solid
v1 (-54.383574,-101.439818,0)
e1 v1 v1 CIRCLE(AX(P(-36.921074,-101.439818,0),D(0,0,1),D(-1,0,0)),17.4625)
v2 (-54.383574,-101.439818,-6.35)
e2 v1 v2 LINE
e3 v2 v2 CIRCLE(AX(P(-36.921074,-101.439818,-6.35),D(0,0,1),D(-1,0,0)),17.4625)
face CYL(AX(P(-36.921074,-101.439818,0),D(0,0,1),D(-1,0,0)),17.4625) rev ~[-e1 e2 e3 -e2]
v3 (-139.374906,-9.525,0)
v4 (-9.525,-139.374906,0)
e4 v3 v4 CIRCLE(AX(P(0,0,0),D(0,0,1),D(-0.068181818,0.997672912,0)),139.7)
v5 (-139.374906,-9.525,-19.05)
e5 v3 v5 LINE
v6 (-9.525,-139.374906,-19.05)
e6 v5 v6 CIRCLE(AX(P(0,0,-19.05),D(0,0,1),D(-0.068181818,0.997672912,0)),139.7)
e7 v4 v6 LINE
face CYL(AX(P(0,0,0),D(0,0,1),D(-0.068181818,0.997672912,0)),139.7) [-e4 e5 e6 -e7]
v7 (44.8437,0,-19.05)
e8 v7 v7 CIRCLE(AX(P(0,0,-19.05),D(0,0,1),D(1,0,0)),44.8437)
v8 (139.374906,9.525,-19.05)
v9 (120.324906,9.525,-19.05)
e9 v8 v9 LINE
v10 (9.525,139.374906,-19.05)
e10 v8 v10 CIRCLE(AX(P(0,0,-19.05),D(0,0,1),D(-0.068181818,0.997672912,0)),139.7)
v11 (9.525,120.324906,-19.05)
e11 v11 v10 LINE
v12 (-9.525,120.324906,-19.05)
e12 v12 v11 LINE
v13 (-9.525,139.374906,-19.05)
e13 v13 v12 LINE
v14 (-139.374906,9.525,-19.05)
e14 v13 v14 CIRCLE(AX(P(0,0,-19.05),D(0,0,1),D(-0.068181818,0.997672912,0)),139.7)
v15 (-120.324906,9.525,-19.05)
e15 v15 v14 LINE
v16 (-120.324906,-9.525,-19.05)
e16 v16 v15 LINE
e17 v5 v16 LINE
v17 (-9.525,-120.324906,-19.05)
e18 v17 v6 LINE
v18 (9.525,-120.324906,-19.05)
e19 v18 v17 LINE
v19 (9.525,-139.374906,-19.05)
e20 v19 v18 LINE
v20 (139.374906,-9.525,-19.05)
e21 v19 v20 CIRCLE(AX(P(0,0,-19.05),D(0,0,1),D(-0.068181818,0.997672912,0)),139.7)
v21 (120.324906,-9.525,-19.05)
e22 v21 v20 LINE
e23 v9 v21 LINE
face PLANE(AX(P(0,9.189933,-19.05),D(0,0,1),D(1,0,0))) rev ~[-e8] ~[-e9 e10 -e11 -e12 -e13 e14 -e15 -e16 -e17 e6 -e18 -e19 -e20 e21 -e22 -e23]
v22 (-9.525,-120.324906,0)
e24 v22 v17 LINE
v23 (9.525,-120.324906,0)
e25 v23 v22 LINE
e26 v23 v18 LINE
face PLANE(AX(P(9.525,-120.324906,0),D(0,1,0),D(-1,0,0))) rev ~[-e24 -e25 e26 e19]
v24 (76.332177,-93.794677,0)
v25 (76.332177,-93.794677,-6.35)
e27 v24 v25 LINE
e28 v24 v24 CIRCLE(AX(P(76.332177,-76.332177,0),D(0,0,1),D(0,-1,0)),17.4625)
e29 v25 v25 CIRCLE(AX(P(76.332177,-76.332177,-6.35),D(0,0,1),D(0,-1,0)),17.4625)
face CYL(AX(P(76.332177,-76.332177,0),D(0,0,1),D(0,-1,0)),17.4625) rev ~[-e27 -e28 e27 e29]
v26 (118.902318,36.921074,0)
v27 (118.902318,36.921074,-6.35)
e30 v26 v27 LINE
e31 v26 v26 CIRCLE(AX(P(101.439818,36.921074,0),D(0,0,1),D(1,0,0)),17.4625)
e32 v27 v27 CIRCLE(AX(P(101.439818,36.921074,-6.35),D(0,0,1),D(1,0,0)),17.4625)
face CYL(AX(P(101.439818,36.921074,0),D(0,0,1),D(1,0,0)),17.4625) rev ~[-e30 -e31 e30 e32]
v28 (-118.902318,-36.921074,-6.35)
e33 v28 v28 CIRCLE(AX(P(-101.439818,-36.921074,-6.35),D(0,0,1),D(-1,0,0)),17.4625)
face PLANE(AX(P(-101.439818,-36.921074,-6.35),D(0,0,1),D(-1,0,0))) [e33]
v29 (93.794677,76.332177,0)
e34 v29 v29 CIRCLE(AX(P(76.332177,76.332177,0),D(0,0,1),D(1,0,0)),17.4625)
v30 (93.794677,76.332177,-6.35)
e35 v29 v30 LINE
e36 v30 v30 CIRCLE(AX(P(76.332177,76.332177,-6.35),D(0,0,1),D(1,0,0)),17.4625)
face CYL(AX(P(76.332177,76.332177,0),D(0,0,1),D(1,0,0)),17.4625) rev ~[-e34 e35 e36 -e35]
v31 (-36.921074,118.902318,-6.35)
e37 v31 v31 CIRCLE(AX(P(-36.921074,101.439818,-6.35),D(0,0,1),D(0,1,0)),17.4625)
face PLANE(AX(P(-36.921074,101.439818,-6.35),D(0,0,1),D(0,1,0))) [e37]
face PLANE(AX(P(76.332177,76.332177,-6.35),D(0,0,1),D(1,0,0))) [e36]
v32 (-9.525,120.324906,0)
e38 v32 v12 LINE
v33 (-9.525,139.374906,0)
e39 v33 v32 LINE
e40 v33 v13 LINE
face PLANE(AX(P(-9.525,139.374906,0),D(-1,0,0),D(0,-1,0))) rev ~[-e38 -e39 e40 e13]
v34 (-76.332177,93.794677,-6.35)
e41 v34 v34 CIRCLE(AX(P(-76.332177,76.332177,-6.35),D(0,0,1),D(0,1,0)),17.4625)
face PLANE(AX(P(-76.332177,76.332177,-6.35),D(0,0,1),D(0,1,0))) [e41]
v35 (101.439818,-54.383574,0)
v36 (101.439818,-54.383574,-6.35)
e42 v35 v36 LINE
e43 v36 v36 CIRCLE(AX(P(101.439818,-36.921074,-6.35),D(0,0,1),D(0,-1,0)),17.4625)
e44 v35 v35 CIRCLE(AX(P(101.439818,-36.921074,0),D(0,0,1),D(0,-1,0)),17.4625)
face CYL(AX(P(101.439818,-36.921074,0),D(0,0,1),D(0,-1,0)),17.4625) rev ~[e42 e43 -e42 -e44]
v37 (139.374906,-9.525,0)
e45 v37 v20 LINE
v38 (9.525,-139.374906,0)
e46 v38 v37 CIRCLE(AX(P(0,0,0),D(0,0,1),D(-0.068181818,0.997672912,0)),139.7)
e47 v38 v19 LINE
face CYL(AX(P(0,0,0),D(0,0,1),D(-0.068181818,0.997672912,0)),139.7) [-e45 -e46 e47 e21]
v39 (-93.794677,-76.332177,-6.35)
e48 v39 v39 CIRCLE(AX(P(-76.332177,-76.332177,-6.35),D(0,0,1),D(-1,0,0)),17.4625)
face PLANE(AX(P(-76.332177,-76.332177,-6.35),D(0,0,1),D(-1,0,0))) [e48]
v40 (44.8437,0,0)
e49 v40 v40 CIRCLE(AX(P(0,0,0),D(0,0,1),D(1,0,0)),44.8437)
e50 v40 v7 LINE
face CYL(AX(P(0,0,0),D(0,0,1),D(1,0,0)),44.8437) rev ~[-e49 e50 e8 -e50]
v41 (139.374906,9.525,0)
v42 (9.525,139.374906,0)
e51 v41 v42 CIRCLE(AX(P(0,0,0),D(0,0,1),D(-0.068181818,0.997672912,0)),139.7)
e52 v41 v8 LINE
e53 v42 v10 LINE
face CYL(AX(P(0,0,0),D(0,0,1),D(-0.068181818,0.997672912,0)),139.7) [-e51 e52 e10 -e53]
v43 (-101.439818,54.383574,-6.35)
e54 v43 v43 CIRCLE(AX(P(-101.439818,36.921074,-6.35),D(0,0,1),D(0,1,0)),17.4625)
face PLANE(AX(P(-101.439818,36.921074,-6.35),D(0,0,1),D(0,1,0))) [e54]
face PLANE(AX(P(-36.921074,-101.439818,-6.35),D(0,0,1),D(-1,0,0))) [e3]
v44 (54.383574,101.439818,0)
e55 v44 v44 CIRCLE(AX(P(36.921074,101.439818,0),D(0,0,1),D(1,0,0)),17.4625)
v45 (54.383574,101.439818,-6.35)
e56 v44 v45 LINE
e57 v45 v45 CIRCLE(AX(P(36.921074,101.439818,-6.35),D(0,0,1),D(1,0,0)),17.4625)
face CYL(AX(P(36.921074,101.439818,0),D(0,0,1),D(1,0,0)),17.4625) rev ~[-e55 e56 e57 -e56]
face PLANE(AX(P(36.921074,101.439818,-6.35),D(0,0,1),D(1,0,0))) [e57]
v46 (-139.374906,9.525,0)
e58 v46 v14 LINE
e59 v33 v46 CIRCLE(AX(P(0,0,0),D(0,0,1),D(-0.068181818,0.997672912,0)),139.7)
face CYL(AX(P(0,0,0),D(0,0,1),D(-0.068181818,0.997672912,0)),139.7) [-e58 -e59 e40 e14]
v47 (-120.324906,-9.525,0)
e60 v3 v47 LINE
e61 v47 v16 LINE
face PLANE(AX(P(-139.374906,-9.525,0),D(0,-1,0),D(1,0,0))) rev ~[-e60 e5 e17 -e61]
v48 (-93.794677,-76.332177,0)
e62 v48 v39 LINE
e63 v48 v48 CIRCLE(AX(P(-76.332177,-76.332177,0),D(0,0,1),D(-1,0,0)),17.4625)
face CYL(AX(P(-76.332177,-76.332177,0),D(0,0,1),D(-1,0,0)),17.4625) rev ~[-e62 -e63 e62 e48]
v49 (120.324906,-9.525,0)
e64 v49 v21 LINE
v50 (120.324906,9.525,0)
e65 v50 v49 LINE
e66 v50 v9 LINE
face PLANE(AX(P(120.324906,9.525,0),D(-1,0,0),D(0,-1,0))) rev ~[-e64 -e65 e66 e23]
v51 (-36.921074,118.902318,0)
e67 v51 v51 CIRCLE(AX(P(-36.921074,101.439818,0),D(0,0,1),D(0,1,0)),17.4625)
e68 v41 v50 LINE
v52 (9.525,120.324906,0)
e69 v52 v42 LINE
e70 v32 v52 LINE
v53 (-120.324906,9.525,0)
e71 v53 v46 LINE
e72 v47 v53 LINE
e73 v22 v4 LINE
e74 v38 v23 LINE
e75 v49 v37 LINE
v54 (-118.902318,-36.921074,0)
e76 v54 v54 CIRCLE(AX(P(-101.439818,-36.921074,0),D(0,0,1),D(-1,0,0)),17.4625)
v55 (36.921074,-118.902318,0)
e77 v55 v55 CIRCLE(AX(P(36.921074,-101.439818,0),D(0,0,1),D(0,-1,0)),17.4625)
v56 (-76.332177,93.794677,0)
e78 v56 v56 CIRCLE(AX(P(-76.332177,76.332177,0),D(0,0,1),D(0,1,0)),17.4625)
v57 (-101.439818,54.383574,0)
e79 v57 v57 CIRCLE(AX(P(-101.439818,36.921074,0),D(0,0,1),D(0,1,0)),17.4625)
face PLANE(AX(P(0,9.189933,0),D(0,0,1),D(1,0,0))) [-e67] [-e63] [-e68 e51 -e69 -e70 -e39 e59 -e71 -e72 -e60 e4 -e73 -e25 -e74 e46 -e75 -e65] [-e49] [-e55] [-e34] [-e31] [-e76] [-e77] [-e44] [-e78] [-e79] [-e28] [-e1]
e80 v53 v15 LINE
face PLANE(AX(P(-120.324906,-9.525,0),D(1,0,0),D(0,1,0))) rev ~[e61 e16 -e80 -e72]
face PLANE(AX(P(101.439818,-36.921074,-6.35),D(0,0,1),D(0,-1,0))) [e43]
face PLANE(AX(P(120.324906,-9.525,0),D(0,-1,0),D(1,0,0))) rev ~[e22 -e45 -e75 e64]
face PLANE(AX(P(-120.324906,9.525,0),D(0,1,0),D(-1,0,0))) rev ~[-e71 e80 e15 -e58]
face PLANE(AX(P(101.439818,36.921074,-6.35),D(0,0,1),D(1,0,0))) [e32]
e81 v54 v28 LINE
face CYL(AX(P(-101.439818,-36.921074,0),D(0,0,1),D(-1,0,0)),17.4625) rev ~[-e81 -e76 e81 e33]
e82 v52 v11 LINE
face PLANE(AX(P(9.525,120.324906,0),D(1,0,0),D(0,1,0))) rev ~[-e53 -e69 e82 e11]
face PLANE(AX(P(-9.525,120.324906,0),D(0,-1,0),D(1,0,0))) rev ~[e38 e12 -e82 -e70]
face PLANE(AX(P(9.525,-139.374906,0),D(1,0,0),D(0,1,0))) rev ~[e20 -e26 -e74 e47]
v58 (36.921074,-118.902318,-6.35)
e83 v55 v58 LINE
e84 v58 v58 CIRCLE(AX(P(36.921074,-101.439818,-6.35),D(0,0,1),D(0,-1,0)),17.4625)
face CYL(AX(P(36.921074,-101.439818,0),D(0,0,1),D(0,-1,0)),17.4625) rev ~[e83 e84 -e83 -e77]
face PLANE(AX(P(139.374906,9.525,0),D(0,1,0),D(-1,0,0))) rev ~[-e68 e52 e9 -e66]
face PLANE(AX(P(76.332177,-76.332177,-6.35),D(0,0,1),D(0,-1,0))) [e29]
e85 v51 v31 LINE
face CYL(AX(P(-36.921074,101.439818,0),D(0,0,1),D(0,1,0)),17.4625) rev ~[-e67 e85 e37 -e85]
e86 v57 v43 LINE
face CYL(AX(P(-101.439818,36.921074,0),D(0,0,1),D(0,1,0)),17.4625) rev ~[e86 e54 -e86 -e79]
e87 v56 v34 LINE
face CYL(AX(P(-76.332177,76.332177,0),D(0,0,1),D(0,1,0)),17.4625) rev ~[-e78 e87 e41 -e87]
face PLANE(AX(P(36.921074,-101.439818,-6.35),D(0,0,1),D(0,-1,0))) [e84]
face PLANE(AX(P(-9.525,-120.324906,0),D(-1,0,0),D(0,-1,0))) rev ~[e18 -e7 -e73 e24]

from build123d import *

# Parameters (mm, degrees)
F0_R            = 44.8437
F0_R_2          = 17.4625
F0_W            = 19.05
F0_H            = 6.35
F1_DEPTH        = 19.05
F2_DEPTH        = 6.35
F2_COPIES_COUNT = 4
F3_DEPTH        = 19.051
F3_COPIES_COUNT = 4
F5_DEPTH        = 25.4


# Not quite as in the source:
# - a pattern or mirror of a feature is missing from the dataset's text; its kind, count and spacing are read off the source's solid


with BuildPart() as f1:
    # F0 (on Top) → F1 (new body)
    with BuildSketch(Plane.XY):
        with BuildLine():
            ThreePointArc((-9.525, 139.3749058296), (-95.3557746023, -102.0948884617), (139.7, 0))
            ThreePointArc((139.7, 0), (102.0948884617, 95.3557746023), (9.525, 139.3749058296))
            Line((9.525, 139.3749058296), (9.525, 120.3249058296))
            Line((9.525, 120.3249058296), (9.525, 113.9749058296))
            Line((9.525, 113.9749058296), (-9.525, 113.9749058296))
            Line((-9.525, 113.9749058296), (-9.525, 120.3249058296))
            Line((-9.525, 120.3249058296), (-9.525, 139.3749058296))
        make_face()
        Circle(F0_R, mode=Mode.SUBTRACT)
        with Locations((101.4398184138, 36.921074472)):
            Circle(F0_R_2, mode=Mode.SUBTRACT)
        with Locations((36.921074472, 101.4398184138)):
            Circle(F0_R_2, mode=Mode.SUBTRACT)
        with Locations((76.3321770291, 76.3321770291)):
            Circle(F0_R_2, mode=Mode.SUBTRACT)
        with BuildLine():
            Line((9.525, 120.3249058296), (9.525, 139.3749058296))
            ThreePointArc((9.525, 139.3749058296), (0, 139.7), (-9.525, 139.3749058296))
            Line((-9.525, 139.3749058296), (-9.525, 120.3249058296))
            Line((-9.525, 120.3249058296), (9.525, 120.3249058296))
        make_face()
        with Locations((36.921074472, 101.4398184138)):
            Circle(F0_R_2)
        with Locations((76.3321770291, 76.3321770291)):
            Circle(F0_R_2)
        with Locations((101.4398184138, 36.921074472)):
            Circle(F0_R_2)
        with Locations((0, 117.1499058296)):
            Rectangle(F0_W, F0_H)
        Circle(F0_R)
    extrude(amount=-F1_DEPTH)

    # F0 (on Top) → F2 (cut)
    with BuildSketch(Plane.XY):
        with Locations((36.921074472, 101.4398184138)):
            Circle(F0_R_2)
        with Locations((76.3321770291, 76.3321770291)):
            Circle(F0_R_2)
        with Locations((101.4398184138, 36.921074472)):
            Circle(F0_R_2)
    f2 = extrude(amount=-F2_DEPTH, mode=Mode.SUBTRACT)

    # F2_copies: F2 ×4 about axis
    f2_copies_axis = Axis((0, 0, 0), (0, 0, 1))
    for i in range(1, F2_COPIES_COUNT):
        add(f2.rotate(f2_copies_axis, i * 360 / F2_COPIES_COUNT), mode=Mode.SUBTRACT)

    # F0 (on Top) → F3 (cut, through all)
    with BuildSketch(Plane.XY):
        with BuildLine():
            Line((9.525, 120.3249058296), (9.525, 139.3749058296))
            ThreePointArc((9.525, 139.3749058296), (0, 139.7), (-9.525, 139.3749058296))
            Line((-9.525, 139.3749058296), (-9.525, 120.3249058296))
            Line((-9.525, 120.3249058296), (9.525, 120.3249058296))
        make_face()
    f3 = extrude(amount=-F3_DEPTH, mode=Mode.SUBTRACT)

    # F3_copies: F3 ×4 about axis
    f3_copies_axis = Axis((0, 0, 0), (0, 0, 1))
    for i in range(1, F3_COPIES_COUNT):
        add(f3.rotate(f3_copies_axis, i * 360 / F3_COPIES_COUNT), mode=Mode.SUBTRACT)

    # F0 (on Top) → F5 (cut)
    with BuildSketch(Plane.XY):
        Circle(F0_R)
    extrude(amount=-F5_DEPTH, mode=Mode.SUBTRACT)


solid = f1.part
